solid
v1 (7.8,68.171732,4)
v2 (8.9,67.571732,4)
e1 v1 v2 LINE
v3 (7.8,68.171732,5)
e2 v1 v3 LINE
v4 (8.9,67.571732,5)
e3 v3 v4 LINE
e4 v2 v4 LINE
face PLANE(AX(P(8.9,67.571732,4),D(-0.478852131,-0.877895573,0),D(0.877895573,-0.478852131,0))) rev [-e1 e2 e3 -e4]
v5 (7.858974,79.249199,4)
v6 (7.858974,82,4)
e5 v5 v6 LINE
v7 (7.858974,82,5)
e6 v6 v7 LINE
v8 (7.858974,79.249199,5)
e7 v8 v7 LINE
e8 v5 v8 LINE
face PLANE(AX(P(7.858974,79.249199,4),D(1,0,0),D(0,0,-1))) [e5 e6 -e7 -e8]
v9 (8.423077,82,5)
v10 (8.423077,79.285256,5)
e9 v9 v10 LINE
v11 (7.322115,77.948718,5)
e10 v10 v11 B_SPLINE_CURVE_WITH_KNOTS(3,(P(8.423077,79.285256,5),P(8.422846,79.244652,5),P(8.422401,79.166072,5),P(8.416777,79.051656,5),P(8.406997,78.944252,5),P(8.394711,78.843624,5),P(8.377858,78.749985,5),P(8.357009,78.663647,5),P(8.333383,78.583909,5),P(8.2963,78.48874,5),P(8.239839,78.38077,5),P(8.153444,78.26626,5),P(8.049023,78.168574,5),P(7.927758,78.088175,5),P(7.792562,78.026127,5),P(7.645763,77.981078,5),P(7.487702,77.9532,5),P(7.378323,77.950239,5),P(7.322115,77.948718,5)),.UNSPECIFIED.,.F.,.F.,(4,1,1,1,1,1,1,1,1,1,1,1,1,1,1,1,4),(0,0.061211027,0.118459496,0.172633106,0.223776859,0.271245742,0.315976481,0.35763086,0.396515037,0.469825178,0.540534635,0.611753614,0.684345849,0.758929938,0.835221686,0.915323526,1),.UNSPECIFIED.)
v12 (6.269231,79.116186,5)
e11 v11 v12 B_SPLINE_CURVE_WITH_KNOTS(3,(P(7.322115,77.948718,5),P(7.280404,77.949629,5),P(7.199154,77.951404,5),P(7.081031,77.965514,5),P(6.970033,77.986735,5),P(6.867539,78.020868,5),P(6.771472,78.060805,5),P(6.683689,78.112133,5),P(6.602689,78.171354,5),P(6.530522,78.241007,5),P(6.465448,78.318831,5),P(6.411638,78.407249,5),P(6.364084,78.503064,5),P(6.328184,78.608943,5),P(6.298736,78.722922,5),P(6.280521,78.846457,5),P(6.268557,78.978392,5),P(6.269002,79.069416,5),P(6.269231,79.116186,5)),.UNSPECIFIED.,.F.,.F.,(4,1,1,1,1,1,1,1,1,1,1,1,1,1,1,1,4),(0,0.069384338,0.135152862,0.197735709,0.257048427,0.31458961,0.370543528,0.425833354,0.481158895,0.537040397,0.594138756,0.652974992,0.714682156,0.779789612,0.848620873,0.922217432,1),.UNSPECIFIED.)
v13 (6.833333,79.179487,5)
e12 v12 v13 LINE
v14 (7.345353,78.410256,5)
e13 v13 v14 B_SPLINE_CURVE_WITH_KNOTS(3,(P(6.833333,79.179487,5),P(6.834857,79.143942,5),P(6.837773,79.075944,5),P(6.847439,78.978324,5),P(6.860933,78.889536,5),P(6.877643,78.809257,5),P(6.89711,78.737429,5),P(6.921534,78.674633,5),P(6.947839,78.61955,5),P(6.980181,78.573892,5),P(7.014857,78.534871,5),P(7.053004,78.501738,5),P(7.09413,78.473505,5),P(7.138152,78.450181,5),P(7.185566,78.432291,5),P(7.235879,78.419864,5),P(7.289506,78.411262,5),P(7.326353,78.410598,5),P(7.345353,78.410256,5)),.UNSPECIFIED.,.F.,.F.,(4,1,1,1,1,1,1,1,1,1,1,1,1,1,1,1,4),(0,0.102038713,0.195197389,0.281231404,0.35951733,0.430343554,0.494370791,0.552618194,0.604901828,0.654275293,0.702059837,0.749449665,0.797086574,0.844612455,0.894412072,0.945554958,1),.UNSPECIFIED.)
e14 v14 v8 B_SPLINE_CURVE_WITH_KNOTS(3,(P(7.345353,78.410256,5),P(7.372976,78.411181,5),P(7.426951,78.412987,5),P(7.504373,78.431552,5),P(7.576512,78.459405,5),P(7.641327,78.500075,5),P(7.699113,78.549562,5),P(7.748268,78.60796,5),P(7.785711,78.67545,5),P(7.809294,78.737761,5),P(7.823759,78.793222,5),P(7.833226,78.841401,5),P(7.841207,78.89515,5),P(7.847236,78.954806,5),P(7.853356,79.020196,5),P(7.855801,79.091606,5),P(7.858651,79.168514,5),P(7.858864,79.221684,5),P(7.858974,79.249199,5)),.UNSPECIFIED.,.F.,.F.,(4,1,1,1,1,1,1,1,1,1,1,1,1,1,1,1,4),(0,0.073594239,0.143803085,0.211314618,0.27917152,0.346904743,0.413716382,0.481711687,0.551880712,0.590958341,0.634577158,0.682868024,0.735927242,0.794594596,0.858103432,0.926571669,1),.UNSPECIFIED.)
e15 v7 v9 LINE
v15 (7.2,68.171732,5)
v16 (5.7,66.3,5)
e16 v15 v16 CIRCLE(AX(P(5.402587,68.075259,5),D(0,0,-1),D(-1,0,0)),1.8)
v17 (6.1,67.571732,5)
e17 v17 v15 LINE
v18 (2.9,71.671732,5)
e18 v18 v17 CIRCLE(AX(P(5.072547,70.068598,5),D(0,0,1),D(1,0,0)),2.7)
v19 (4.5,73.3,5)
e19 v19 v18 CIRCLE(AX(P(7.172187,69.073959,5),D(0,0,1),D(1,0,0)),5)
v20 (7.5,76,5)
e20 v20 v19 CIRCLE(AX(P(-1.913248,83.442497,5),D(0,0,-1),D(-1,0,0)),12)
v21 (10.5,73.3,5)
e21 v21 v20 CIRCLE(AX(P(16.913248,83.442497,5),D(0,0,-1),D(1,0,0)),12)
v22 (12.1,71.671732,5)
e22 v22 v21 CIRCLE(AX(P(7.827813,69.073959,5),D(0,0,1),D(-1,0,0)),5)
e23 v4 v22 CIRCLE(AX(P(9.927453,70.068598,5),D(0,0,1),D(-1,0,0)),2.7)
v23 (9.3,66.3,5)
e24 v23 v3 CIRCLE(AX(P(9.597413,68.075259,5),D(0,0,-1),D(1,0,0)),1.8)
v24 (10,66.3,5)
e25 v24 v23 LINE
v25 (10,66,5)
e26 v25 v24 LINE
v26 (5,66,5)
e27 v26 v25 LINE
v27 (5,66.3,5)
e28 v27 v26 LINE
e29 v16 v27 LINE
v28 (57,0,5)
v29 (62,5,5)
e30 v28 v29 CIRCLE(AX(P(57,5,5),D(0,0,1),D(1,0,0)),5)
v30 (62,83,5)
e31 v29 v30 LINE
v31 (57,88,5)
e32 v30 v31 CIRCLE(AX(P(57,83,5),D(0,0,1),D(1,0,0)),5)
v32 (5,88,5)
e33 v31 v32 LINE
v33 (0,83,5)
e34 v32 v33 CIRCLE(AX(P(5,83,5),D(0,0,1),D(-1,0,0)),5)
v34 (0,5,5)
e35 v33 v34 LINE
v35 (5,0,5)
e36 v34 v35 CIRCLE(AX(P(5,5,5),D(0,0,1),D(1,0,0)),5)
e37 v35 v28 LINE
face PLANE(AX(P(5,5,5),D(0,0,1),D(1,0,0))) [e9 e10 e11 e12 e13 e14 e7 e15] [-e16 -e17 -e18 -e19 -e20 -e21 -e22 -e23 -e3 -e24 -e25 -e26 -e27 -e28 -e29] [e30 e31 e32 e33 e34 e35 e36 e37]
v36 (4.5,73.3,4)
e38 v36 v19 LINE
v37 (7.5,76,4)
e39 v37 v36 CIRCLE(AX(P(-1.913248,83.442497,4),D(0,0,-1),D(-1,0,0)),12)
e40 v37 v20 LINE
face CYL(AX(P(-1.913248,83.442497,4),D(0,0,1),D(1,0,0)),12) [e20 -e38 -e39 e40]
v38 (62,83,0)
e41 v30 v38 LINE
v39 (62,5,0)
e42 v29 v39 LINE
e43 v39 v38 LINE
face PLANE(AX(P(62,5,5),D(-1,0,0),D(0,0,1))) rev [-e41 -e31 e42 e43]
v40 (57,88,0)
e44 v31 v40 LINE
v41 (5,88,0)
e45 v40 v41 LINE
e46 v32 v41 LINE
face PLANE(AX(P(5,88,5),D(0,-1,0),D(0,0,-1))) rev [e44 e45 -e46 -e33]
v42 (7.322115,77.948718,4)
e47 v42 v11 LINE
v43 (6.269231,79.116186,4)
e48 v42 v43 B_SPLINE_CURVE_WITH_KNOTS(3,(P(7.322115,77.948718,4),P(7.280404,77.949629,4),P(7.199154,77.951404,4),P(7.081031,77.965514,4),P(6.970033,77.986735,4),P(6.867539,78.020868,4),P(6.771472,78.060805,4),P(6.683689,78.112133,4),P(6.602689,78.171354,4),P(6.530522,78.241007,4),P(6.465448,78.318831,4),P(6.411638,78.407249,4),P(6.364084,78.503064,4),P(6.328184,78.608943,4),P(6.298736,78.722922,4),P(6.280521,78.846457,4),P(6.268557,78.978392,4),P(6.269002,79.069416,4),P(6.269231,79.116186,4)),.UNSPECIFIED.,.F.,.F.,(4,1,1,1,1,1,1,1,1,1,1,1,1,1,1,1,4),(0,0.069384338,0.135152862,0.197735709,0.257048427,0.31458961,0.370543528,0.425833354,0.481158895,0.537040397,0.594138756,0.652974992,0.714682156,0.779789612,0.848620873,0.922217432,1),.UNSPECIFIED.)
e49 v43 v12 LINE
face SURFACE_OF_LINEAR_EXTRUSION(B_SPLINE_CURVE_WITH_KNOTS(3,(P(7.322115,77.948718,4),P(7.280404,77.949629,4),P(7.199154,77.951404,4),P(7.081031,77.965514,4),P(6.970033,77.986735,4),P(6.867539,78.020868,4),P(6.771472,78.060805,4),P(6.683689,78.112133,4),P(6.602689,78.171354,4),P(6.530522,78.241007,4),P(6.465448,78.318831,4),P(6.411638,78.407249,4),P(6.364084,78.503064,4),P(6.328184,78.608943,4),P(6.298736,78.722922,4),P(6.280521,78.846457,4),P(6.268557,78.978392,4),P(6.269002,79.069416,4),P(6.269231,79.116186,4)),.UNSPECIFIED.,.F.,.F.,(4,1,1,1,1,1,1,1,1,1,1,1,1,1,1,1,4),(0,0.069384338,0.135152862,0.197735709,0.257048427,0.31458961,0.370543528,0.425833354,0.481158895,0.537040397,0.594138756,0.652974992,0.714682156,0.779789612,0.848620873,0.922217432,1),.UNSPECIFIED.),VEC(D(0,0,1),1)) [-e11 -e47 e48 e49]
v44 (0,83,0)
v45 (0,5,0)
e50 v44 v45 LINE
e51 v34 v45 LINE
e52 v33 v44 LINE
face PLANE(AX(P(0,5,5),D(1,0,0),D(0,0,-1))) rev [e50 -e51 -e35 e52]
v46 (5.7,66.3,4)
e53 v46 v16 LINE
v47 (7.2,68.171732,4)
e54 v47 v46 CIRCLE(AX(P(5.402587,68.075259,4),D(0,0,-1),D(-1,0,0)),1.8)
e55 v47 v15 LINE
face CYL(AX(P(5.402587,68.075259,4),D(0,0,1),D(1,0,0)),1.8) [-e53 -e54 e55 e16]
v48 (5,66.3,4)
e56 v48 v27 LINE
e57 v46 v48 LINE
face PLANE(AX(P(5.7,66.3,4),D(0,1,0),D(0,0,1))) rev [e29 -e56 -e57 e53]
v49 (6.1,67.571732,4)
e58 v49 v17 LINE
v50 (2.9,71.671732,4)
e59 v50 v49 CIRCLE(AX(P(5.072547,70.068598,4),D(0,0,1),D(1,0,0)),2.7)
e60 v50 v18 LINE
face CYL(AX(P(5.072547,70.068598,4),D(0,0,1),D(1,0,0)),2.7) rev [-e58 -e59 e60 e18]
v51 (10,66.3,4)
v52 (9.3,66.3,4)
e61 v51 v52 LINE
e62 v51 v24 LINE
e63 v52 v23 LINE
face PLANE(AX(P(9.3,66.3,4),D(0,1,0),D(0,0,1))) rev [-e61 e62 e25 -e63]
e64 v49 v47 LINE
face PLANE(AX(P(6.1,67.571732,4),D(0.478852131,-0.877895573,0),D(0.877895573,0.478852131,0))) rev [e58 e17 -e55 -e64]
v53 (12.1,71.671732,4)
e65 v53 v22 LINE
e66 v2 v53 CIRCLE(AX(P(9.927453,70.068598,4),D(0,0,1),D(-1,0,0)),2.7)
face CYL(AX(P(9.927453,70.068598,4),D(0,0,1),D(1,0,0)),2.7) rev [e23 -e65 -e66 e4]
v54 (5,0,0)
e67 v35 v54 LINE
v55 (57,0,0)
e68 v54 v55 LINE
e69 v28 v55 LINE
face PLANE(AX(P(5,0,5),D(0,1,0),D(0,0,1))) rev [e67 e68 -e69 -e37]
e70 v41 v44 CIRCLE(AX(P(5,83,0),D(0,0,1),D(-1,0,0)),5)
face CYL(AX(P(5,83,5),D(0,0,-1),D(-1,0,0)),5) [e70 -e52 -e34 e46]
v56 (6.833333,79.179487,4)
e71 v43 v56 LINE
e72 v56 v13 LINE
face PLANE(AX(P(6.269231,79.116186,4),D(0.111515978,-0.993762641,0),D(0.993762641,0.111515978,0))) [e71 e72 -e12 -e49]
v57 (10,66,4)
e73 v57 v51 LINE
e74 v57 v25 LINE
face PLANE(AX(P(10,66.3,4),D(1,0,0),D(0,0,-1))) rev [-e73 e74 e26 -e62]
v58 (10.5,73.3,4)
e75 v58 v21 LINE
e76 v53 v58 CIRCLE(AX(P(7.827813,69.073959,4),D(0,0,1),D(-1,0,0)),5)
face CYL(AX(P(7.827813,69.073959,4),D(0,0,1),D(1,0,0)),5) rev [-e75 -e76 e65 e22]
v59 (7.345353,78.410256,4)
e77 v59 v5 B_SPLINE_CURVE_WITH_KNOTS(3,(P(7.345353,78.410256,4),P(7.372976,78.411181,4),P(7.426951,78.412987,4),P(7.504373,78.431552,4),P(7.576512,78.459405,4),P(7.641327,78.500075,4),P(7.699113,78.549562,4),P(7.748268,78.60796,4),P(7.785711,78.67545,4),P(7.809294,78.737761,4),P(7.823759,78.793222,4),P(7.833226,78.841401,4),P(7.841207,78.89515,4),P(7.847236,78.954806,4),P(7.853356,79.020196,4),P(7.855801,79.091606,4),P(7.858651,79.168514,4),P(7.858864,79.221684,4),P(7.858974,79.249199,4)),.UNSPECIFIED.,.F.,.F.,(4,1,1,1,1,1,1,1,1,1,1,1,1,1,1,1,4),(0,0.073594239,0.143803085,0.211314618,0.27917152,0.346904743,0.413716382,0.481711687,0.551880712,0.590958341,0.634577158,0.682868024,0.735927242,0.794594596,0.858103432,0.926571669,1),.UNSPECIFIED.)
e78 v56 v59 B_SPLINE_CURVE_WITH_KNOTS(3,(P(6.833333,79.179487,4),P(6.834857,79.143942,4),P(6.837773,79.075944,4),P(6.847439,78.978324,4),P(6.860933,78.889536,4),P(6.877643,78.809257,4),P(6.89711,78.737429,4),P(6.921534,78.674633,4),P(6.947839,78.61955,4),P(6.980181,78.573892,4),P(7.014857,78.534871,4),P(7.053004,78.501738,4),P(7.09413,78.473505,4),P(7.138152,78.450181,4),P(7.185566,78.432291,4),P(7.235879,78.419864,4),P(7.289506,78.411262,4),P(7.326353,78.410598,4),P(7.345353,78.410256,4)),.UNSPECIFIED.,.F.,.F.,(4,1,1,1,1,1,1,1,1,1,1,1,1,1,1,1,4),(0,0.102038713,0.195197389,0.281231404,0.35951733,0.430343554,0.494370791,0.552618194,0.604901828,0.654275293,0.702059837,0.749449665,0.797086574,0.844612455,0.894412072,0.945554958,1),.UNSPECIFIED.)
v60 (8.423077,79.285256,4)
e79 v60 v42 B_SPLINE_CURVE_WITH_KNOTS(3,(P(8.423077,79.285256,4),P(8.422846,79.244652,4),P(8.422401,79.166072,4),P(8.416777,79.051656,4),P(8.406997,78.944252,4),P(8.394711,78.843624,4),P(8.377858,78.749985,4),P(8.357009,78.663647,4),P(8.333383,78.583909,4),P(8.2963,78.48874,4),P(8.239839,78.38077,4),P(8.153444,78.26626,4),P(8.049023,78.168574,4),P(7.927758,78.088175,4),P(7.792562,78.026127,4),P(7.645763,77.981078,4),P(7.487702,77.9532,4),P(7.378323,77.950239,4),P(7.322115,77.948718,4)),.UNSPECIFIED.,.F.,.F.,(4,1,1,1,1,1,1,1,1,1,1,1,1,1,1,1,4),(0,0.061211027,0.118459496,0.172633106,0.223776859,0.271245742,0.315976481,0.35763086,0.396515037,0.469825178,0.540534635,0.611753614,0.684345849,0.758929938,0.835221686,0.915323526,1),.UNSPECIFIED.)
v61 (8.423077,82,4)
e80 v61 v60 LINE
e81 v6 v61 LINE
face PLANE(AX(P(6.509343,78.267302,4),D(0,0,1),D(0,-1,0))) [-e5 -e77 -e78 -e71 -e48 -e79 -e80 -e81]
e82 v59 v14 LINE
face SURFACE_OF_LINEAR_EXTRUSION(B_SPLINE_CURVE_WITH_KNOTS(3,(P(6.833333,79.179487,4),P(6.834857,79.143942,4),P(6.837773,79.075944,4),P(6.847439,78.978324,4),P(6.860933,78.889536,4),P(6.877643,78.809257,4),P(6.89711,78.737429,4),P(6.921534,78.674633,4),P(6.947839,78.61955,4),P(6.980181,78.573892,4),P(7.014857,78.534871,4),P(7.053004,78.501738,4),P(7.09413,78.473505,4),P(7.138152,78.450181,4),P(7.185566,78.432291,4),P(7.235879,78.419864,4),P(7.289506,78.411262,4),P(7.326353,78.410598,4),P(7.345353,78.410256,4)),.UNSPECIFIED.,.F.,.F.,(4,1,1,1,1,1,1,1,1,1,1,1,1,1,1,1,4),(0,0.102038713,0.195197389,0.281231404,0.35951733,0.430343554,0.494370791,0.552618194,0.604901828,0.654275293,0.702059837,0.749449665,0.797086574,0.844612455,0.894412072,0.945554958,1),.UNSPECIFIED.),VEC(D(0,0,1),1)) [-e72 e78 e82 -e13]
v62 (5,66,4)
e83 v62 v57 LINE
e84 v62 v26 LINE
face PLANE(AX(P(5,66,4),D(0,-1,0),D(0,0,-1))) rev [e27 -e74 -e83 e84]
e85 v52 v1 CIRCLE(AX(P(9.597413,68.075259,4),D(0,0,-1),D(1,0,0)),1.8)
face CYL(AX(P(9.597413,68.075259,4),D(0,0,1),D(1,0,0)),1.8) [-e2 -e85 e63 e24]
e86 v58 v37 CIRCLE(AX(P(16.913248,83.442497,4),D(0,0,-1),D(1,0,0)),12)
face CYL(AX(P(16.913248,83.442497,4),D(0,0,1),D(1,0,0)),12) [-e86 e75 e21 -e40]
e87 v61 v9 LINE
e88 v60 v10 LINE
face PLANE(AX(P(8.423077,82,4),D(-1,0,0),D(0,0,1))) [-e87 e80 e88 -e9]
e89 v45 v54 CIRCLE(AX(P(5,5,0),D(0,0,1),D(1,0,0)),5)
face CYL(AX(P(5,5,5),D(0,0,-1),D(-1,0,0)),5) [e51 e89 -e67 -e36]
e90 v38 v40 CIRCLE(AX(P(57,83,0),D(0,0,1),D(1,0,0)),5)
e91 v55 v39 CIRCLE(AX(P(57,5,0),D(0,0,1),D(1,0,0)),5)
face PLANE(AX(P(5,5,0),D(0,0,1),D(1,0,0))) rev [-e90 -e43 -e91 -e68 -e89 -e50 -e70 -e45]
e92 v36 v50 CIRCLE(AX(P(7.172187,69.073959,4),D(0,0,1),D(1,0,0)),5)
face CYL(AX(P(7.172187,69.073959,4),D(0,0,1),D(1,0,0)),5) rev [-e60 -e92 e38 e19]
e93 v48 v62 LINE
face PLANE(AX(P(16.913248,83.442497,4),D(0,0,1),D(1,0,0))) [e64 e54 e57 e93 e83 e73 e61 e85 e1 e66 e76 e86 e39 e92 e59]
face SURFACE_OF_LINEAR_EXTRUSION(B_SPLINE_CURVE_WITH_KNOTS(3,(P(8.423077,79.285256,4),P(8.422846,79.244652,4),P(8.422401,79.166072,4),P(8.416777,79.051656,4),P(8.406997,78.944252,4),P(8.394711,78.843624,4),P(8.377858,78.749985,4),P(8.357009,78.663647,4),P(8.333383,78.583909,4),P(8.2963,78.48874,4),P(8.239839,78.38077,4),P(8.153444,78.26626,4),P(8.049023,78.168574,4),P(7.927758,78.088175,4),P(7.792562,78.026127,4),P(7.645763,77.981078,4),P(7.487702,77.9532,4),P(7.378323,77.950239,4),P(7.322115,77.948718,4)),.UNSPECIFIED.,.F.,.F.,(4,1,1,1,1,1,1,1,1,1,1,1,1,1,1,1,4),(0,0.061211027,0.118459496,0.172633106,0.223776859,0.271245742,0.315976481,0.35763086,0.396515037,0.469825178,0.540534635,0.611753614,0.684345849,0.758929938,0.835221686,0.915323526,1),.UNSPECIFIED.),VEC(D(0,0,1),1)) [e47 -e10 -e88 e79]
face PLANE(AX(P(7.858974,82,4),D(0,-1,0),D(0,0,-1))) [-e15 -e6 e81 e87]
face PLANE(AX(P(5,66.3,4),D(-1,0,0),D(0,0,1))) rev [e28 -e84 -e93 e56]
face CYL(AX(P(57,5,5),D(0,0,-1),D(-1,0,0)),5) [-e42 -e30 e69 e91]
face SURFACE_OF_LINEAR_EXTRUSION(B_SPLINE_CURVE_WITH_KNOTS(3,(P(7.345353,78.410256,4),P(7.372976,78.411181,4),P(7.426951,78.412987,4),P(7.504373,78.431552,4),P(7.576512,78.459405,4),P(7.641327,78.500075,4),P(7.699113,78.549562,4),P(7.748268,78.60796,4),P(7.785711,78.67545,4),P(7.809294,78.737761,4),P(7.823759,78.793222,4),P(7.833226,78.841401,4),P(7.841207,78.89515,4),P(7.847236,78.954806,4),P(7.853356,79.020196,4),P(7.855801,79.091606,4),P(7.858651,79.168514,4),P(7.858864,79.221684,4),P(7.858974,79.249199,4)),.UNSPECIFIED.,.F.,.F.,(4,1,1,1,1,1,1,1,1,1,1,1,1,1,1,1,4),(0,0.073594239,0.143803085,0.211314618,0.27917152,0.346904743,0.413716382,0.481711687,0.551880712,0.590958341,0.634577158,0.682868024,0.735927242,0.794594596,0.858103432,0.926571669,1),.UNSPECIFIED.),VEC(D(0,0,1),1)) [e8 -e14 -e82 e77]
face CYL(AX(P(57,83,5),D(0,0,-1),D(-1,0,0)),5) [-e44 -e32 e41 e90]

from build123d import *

# Parameters (mm, degrees)
EXTRUDE_1_DEPTH     = 5
CUT_EXTRUDE_START   = -1
CUT_EXTRUDE_3_DEPTH = 1


# Read off the part's stored shape, not the designer's step: Вырез-Вытянуть3
with BuildPart() as part:
    # Эскиз1 → Бобышка-Вытянуть1 (new body)
    with BuildSketch(Plane.XY):
        with BuildLine():
            Line((5, 0), (57, 0))
            ThreePointArc((57, 0), (60.535533906, 1.464466094), (62, 5))
            Line((62, 5), (62, 83))
            ThreePointArc((62, 83), (60.535533906, 86.535533906), (57, 88))
            Line((57, 88), (5, 88))
            ThreePointArc((5, 88), (1.464466094, 86.535533906), (0, 83))
            Line((0, 83), (0, 5))
            ThreePointArc((0, 5), (1.464466094, 1.464466094), (5, 0))
        make_face()
    extrude(amount=EXTRUDE_1_DEPTH)

    # Вырез-Вытянуть3 outline → Вырез-Вытянуть3 (cut)
    with BuildSketch(Plane.XY.offset(5).offset(CUT_EXTRUDE_START)):
        with BuildLine():
            add(Edge.make_bspline(
                [(7.322115385, 77.948717949), (7.280403728, 77.949629189), (7.199154126, 77.951404182), (7.08103096, 77.965514138), (6.970032623, 77.986734715), (6.86753928, 78.020868189), (6.771471542, 78.06080497), (6.683688955, 78.112132534), (6.602688938, 78.171353702), (6.530522286, 78.24100741), (6.465447665, 78.318830964), (6.41163812, 78.407249412), (6.364084469, 78.503063707), (6.328183734, 78.608942585), (6.298735587, 78.722922407), (6.2805208, 78.846457423), (6.268556671, 78.978392008), (6.269001965, 79.069415592), (6.269230769, 79.116185897)],
                knots=[0, 0, 0, 0, 0.069384338, 0.135152862, 0.197735709, 0.257048427, 0.31458961, 0.370543528, 0.425833354, 0.481158895, 0.537040397, 0.594138756, 0.652974992, 0.714682156, 0.779789612, 0.848620873, 0.922217432, 1, 1, 1, 1], degree=3))
            add(Edge.make_bspline(
                [(8.423076923, 79.28525641), (8.422846482, 79.24465196), (8.422400519, 79.16607163), (8.416777036, 79.051655992), (8.406996568, 78.94425203), (8.394710578, 78.843624109), (8.377857705, 78.749984901), (8.357009271, 78.663646779), (8.333382771, 78.583908695), (8.296299771, 78.48874028), (8.239839042, 78.380770097), (8.153444079, 78.266259522), (8.049022592, 78.168573661), (7.9277584, 78.088174586), (7.79256156, 78.026127128), (7.645762848, 77.981077752), (7.487701683, 77.953199535), (7.378323021, 77.950239206), (7.322115385, 77.948717949)],
                knots=[0, 0, 0, 0, 0.061211027, 0.118459496, 0.172633106, 0.223776859, 0.271245742, 0.315976481, 0.35763086, 0.396515037, 0.469825178, 0.540534635, 0.611753614, 0.684345849, 0.758929938, 0.835221686, 0.915323526, 1, 1, 1, 1], degree=3))
            Line((8.423076923, 79.28525641), (8.423076923, 82))
            Line((8.423076923, 82), (7.858974359, 82))
            Line((7.858974359, 82), (7.858974359, 79.249198718))
            add(Edge.make_bspline(
                [(7.345352564, 78.41025641), (7.372975773, 78.411180822), (7.4269515, 78.412987123), (7.504373326, 78.431551652), (7.576511792, 78.459404941), (7.641326576, 78.500074876), (7.699113429, 78.549562242), (7.748268345, 78.607960428), (7.785711282, 78.675450105), (7.809293621, 78.737761499), (7.823759213, 78.793221645), (7.83322618, 78.841401042), (7.841207325, 78.895150355), (7.847235632, 78.954806458), (7.853355796, 79.020196267), (7.855800765, 79.091605618), (7.858650581, 79.16851443), (7.858863947, 79.221684424), (7.858974359, 79.249198718)],
                knots=[0, 0, 0, 0, 0.073594239, 0.143803085, 0.211314618, 0.27917152, 0.346904743, 0.413716382, 0.481711687, 0.551880712, 0.590958341, 0.634577158, 0.682868024, 0.735927242, 0.794594596, 0.858103432, 0.926571669, 1, 1, 1, 1], degree=3))
            add(Edge.make_bspline(
                [(6.833333333, 79.179487179), (6.834857441, 79.143941678), (6.83777302, 79.075944064), (6.84743928, 78.978324165), (6.860933127, 78.889536466), (6.877643129, 78.809256715), (6.897109916, 78.737429188), (6.921534218, 78.674633381), (6.947839007, 78.619549931), (6.980181111, 78.573892339), (7.014857408, 78.53487098), (7.053004363, 78.501738163), (7.094129871, 78.473504515), (7.138151962, 78.450181335), (7.185565934, 78.432291412), (7.235878922, 78.419864447), (7.289505669, 78.411261561), (7.326352813, 78.410598374), (7.345352564, 78.41025641)],
                knots=[0, 0, 0, 0, 0.102038713, 0.195197389, 0.281231404, 0.35951733, 0.430343554, 0.494370791, 0.552618194, 0.604901828, 0.654275293, 0.702059837, 0.749449665, 0.797086574, 0.844612455, 0.894412072, 0.945554958, 1, 1, 1, 1], degree=3))
            Line((6.833333333, 79.179487179), (6.269230769, 79.116185897))
        make_face()
        with BuildLine():
            ThreePointArc((10.5, 73.3), (8.885670907, 74.522967675), (7.5, 76))
            ThreePointArc((7.5, 76), (6.114329093, 74.522967675), (4.5, 73.3))
            ThreePointArc((4.5, 73.3), (3.605830756, 72.578400365), (2.9, 71.67173195))
            ThreePointArc((2.9, 71.67173195), (2.944094794, 68.407366911), (6.1, 67.57173195))
            Line((6.1, 67.57173195), (7.2, 68.17173195))
            ThreePointArc((7.2, 68.17173195), (6.807193425, 66.949612307), (5.7, 66.3))
            Line((5.7, 66.3), (5, 66.3))
            Line((5, 66.3), (5, 66))
            Line((5, 66), (10, 66))
            Line((10, 66), (10, 66.3))
            Line((10, 66.3), (9.3, 66.3))
            ThreePointArc((9.3, 66.3), (8.192806575, 66.949612307), (7.8, 68.17173195))
            Line((7.8, 68.17173195), (8.9, 67.57173195))
            ThreePointArc((8.9, 67.57173195), (12.055905206, 68.407366911), (12.1, 71.67173195))
            ThreePointArc((12.1, 71.67173195), (11.394169244, 72.578400365), (10.5, 73.3))
        make_face()
    extrude(amount=CUT_EXTRUDE_3_DEPTH, mode=Mode.SUBTRACT)


solid = part.part
